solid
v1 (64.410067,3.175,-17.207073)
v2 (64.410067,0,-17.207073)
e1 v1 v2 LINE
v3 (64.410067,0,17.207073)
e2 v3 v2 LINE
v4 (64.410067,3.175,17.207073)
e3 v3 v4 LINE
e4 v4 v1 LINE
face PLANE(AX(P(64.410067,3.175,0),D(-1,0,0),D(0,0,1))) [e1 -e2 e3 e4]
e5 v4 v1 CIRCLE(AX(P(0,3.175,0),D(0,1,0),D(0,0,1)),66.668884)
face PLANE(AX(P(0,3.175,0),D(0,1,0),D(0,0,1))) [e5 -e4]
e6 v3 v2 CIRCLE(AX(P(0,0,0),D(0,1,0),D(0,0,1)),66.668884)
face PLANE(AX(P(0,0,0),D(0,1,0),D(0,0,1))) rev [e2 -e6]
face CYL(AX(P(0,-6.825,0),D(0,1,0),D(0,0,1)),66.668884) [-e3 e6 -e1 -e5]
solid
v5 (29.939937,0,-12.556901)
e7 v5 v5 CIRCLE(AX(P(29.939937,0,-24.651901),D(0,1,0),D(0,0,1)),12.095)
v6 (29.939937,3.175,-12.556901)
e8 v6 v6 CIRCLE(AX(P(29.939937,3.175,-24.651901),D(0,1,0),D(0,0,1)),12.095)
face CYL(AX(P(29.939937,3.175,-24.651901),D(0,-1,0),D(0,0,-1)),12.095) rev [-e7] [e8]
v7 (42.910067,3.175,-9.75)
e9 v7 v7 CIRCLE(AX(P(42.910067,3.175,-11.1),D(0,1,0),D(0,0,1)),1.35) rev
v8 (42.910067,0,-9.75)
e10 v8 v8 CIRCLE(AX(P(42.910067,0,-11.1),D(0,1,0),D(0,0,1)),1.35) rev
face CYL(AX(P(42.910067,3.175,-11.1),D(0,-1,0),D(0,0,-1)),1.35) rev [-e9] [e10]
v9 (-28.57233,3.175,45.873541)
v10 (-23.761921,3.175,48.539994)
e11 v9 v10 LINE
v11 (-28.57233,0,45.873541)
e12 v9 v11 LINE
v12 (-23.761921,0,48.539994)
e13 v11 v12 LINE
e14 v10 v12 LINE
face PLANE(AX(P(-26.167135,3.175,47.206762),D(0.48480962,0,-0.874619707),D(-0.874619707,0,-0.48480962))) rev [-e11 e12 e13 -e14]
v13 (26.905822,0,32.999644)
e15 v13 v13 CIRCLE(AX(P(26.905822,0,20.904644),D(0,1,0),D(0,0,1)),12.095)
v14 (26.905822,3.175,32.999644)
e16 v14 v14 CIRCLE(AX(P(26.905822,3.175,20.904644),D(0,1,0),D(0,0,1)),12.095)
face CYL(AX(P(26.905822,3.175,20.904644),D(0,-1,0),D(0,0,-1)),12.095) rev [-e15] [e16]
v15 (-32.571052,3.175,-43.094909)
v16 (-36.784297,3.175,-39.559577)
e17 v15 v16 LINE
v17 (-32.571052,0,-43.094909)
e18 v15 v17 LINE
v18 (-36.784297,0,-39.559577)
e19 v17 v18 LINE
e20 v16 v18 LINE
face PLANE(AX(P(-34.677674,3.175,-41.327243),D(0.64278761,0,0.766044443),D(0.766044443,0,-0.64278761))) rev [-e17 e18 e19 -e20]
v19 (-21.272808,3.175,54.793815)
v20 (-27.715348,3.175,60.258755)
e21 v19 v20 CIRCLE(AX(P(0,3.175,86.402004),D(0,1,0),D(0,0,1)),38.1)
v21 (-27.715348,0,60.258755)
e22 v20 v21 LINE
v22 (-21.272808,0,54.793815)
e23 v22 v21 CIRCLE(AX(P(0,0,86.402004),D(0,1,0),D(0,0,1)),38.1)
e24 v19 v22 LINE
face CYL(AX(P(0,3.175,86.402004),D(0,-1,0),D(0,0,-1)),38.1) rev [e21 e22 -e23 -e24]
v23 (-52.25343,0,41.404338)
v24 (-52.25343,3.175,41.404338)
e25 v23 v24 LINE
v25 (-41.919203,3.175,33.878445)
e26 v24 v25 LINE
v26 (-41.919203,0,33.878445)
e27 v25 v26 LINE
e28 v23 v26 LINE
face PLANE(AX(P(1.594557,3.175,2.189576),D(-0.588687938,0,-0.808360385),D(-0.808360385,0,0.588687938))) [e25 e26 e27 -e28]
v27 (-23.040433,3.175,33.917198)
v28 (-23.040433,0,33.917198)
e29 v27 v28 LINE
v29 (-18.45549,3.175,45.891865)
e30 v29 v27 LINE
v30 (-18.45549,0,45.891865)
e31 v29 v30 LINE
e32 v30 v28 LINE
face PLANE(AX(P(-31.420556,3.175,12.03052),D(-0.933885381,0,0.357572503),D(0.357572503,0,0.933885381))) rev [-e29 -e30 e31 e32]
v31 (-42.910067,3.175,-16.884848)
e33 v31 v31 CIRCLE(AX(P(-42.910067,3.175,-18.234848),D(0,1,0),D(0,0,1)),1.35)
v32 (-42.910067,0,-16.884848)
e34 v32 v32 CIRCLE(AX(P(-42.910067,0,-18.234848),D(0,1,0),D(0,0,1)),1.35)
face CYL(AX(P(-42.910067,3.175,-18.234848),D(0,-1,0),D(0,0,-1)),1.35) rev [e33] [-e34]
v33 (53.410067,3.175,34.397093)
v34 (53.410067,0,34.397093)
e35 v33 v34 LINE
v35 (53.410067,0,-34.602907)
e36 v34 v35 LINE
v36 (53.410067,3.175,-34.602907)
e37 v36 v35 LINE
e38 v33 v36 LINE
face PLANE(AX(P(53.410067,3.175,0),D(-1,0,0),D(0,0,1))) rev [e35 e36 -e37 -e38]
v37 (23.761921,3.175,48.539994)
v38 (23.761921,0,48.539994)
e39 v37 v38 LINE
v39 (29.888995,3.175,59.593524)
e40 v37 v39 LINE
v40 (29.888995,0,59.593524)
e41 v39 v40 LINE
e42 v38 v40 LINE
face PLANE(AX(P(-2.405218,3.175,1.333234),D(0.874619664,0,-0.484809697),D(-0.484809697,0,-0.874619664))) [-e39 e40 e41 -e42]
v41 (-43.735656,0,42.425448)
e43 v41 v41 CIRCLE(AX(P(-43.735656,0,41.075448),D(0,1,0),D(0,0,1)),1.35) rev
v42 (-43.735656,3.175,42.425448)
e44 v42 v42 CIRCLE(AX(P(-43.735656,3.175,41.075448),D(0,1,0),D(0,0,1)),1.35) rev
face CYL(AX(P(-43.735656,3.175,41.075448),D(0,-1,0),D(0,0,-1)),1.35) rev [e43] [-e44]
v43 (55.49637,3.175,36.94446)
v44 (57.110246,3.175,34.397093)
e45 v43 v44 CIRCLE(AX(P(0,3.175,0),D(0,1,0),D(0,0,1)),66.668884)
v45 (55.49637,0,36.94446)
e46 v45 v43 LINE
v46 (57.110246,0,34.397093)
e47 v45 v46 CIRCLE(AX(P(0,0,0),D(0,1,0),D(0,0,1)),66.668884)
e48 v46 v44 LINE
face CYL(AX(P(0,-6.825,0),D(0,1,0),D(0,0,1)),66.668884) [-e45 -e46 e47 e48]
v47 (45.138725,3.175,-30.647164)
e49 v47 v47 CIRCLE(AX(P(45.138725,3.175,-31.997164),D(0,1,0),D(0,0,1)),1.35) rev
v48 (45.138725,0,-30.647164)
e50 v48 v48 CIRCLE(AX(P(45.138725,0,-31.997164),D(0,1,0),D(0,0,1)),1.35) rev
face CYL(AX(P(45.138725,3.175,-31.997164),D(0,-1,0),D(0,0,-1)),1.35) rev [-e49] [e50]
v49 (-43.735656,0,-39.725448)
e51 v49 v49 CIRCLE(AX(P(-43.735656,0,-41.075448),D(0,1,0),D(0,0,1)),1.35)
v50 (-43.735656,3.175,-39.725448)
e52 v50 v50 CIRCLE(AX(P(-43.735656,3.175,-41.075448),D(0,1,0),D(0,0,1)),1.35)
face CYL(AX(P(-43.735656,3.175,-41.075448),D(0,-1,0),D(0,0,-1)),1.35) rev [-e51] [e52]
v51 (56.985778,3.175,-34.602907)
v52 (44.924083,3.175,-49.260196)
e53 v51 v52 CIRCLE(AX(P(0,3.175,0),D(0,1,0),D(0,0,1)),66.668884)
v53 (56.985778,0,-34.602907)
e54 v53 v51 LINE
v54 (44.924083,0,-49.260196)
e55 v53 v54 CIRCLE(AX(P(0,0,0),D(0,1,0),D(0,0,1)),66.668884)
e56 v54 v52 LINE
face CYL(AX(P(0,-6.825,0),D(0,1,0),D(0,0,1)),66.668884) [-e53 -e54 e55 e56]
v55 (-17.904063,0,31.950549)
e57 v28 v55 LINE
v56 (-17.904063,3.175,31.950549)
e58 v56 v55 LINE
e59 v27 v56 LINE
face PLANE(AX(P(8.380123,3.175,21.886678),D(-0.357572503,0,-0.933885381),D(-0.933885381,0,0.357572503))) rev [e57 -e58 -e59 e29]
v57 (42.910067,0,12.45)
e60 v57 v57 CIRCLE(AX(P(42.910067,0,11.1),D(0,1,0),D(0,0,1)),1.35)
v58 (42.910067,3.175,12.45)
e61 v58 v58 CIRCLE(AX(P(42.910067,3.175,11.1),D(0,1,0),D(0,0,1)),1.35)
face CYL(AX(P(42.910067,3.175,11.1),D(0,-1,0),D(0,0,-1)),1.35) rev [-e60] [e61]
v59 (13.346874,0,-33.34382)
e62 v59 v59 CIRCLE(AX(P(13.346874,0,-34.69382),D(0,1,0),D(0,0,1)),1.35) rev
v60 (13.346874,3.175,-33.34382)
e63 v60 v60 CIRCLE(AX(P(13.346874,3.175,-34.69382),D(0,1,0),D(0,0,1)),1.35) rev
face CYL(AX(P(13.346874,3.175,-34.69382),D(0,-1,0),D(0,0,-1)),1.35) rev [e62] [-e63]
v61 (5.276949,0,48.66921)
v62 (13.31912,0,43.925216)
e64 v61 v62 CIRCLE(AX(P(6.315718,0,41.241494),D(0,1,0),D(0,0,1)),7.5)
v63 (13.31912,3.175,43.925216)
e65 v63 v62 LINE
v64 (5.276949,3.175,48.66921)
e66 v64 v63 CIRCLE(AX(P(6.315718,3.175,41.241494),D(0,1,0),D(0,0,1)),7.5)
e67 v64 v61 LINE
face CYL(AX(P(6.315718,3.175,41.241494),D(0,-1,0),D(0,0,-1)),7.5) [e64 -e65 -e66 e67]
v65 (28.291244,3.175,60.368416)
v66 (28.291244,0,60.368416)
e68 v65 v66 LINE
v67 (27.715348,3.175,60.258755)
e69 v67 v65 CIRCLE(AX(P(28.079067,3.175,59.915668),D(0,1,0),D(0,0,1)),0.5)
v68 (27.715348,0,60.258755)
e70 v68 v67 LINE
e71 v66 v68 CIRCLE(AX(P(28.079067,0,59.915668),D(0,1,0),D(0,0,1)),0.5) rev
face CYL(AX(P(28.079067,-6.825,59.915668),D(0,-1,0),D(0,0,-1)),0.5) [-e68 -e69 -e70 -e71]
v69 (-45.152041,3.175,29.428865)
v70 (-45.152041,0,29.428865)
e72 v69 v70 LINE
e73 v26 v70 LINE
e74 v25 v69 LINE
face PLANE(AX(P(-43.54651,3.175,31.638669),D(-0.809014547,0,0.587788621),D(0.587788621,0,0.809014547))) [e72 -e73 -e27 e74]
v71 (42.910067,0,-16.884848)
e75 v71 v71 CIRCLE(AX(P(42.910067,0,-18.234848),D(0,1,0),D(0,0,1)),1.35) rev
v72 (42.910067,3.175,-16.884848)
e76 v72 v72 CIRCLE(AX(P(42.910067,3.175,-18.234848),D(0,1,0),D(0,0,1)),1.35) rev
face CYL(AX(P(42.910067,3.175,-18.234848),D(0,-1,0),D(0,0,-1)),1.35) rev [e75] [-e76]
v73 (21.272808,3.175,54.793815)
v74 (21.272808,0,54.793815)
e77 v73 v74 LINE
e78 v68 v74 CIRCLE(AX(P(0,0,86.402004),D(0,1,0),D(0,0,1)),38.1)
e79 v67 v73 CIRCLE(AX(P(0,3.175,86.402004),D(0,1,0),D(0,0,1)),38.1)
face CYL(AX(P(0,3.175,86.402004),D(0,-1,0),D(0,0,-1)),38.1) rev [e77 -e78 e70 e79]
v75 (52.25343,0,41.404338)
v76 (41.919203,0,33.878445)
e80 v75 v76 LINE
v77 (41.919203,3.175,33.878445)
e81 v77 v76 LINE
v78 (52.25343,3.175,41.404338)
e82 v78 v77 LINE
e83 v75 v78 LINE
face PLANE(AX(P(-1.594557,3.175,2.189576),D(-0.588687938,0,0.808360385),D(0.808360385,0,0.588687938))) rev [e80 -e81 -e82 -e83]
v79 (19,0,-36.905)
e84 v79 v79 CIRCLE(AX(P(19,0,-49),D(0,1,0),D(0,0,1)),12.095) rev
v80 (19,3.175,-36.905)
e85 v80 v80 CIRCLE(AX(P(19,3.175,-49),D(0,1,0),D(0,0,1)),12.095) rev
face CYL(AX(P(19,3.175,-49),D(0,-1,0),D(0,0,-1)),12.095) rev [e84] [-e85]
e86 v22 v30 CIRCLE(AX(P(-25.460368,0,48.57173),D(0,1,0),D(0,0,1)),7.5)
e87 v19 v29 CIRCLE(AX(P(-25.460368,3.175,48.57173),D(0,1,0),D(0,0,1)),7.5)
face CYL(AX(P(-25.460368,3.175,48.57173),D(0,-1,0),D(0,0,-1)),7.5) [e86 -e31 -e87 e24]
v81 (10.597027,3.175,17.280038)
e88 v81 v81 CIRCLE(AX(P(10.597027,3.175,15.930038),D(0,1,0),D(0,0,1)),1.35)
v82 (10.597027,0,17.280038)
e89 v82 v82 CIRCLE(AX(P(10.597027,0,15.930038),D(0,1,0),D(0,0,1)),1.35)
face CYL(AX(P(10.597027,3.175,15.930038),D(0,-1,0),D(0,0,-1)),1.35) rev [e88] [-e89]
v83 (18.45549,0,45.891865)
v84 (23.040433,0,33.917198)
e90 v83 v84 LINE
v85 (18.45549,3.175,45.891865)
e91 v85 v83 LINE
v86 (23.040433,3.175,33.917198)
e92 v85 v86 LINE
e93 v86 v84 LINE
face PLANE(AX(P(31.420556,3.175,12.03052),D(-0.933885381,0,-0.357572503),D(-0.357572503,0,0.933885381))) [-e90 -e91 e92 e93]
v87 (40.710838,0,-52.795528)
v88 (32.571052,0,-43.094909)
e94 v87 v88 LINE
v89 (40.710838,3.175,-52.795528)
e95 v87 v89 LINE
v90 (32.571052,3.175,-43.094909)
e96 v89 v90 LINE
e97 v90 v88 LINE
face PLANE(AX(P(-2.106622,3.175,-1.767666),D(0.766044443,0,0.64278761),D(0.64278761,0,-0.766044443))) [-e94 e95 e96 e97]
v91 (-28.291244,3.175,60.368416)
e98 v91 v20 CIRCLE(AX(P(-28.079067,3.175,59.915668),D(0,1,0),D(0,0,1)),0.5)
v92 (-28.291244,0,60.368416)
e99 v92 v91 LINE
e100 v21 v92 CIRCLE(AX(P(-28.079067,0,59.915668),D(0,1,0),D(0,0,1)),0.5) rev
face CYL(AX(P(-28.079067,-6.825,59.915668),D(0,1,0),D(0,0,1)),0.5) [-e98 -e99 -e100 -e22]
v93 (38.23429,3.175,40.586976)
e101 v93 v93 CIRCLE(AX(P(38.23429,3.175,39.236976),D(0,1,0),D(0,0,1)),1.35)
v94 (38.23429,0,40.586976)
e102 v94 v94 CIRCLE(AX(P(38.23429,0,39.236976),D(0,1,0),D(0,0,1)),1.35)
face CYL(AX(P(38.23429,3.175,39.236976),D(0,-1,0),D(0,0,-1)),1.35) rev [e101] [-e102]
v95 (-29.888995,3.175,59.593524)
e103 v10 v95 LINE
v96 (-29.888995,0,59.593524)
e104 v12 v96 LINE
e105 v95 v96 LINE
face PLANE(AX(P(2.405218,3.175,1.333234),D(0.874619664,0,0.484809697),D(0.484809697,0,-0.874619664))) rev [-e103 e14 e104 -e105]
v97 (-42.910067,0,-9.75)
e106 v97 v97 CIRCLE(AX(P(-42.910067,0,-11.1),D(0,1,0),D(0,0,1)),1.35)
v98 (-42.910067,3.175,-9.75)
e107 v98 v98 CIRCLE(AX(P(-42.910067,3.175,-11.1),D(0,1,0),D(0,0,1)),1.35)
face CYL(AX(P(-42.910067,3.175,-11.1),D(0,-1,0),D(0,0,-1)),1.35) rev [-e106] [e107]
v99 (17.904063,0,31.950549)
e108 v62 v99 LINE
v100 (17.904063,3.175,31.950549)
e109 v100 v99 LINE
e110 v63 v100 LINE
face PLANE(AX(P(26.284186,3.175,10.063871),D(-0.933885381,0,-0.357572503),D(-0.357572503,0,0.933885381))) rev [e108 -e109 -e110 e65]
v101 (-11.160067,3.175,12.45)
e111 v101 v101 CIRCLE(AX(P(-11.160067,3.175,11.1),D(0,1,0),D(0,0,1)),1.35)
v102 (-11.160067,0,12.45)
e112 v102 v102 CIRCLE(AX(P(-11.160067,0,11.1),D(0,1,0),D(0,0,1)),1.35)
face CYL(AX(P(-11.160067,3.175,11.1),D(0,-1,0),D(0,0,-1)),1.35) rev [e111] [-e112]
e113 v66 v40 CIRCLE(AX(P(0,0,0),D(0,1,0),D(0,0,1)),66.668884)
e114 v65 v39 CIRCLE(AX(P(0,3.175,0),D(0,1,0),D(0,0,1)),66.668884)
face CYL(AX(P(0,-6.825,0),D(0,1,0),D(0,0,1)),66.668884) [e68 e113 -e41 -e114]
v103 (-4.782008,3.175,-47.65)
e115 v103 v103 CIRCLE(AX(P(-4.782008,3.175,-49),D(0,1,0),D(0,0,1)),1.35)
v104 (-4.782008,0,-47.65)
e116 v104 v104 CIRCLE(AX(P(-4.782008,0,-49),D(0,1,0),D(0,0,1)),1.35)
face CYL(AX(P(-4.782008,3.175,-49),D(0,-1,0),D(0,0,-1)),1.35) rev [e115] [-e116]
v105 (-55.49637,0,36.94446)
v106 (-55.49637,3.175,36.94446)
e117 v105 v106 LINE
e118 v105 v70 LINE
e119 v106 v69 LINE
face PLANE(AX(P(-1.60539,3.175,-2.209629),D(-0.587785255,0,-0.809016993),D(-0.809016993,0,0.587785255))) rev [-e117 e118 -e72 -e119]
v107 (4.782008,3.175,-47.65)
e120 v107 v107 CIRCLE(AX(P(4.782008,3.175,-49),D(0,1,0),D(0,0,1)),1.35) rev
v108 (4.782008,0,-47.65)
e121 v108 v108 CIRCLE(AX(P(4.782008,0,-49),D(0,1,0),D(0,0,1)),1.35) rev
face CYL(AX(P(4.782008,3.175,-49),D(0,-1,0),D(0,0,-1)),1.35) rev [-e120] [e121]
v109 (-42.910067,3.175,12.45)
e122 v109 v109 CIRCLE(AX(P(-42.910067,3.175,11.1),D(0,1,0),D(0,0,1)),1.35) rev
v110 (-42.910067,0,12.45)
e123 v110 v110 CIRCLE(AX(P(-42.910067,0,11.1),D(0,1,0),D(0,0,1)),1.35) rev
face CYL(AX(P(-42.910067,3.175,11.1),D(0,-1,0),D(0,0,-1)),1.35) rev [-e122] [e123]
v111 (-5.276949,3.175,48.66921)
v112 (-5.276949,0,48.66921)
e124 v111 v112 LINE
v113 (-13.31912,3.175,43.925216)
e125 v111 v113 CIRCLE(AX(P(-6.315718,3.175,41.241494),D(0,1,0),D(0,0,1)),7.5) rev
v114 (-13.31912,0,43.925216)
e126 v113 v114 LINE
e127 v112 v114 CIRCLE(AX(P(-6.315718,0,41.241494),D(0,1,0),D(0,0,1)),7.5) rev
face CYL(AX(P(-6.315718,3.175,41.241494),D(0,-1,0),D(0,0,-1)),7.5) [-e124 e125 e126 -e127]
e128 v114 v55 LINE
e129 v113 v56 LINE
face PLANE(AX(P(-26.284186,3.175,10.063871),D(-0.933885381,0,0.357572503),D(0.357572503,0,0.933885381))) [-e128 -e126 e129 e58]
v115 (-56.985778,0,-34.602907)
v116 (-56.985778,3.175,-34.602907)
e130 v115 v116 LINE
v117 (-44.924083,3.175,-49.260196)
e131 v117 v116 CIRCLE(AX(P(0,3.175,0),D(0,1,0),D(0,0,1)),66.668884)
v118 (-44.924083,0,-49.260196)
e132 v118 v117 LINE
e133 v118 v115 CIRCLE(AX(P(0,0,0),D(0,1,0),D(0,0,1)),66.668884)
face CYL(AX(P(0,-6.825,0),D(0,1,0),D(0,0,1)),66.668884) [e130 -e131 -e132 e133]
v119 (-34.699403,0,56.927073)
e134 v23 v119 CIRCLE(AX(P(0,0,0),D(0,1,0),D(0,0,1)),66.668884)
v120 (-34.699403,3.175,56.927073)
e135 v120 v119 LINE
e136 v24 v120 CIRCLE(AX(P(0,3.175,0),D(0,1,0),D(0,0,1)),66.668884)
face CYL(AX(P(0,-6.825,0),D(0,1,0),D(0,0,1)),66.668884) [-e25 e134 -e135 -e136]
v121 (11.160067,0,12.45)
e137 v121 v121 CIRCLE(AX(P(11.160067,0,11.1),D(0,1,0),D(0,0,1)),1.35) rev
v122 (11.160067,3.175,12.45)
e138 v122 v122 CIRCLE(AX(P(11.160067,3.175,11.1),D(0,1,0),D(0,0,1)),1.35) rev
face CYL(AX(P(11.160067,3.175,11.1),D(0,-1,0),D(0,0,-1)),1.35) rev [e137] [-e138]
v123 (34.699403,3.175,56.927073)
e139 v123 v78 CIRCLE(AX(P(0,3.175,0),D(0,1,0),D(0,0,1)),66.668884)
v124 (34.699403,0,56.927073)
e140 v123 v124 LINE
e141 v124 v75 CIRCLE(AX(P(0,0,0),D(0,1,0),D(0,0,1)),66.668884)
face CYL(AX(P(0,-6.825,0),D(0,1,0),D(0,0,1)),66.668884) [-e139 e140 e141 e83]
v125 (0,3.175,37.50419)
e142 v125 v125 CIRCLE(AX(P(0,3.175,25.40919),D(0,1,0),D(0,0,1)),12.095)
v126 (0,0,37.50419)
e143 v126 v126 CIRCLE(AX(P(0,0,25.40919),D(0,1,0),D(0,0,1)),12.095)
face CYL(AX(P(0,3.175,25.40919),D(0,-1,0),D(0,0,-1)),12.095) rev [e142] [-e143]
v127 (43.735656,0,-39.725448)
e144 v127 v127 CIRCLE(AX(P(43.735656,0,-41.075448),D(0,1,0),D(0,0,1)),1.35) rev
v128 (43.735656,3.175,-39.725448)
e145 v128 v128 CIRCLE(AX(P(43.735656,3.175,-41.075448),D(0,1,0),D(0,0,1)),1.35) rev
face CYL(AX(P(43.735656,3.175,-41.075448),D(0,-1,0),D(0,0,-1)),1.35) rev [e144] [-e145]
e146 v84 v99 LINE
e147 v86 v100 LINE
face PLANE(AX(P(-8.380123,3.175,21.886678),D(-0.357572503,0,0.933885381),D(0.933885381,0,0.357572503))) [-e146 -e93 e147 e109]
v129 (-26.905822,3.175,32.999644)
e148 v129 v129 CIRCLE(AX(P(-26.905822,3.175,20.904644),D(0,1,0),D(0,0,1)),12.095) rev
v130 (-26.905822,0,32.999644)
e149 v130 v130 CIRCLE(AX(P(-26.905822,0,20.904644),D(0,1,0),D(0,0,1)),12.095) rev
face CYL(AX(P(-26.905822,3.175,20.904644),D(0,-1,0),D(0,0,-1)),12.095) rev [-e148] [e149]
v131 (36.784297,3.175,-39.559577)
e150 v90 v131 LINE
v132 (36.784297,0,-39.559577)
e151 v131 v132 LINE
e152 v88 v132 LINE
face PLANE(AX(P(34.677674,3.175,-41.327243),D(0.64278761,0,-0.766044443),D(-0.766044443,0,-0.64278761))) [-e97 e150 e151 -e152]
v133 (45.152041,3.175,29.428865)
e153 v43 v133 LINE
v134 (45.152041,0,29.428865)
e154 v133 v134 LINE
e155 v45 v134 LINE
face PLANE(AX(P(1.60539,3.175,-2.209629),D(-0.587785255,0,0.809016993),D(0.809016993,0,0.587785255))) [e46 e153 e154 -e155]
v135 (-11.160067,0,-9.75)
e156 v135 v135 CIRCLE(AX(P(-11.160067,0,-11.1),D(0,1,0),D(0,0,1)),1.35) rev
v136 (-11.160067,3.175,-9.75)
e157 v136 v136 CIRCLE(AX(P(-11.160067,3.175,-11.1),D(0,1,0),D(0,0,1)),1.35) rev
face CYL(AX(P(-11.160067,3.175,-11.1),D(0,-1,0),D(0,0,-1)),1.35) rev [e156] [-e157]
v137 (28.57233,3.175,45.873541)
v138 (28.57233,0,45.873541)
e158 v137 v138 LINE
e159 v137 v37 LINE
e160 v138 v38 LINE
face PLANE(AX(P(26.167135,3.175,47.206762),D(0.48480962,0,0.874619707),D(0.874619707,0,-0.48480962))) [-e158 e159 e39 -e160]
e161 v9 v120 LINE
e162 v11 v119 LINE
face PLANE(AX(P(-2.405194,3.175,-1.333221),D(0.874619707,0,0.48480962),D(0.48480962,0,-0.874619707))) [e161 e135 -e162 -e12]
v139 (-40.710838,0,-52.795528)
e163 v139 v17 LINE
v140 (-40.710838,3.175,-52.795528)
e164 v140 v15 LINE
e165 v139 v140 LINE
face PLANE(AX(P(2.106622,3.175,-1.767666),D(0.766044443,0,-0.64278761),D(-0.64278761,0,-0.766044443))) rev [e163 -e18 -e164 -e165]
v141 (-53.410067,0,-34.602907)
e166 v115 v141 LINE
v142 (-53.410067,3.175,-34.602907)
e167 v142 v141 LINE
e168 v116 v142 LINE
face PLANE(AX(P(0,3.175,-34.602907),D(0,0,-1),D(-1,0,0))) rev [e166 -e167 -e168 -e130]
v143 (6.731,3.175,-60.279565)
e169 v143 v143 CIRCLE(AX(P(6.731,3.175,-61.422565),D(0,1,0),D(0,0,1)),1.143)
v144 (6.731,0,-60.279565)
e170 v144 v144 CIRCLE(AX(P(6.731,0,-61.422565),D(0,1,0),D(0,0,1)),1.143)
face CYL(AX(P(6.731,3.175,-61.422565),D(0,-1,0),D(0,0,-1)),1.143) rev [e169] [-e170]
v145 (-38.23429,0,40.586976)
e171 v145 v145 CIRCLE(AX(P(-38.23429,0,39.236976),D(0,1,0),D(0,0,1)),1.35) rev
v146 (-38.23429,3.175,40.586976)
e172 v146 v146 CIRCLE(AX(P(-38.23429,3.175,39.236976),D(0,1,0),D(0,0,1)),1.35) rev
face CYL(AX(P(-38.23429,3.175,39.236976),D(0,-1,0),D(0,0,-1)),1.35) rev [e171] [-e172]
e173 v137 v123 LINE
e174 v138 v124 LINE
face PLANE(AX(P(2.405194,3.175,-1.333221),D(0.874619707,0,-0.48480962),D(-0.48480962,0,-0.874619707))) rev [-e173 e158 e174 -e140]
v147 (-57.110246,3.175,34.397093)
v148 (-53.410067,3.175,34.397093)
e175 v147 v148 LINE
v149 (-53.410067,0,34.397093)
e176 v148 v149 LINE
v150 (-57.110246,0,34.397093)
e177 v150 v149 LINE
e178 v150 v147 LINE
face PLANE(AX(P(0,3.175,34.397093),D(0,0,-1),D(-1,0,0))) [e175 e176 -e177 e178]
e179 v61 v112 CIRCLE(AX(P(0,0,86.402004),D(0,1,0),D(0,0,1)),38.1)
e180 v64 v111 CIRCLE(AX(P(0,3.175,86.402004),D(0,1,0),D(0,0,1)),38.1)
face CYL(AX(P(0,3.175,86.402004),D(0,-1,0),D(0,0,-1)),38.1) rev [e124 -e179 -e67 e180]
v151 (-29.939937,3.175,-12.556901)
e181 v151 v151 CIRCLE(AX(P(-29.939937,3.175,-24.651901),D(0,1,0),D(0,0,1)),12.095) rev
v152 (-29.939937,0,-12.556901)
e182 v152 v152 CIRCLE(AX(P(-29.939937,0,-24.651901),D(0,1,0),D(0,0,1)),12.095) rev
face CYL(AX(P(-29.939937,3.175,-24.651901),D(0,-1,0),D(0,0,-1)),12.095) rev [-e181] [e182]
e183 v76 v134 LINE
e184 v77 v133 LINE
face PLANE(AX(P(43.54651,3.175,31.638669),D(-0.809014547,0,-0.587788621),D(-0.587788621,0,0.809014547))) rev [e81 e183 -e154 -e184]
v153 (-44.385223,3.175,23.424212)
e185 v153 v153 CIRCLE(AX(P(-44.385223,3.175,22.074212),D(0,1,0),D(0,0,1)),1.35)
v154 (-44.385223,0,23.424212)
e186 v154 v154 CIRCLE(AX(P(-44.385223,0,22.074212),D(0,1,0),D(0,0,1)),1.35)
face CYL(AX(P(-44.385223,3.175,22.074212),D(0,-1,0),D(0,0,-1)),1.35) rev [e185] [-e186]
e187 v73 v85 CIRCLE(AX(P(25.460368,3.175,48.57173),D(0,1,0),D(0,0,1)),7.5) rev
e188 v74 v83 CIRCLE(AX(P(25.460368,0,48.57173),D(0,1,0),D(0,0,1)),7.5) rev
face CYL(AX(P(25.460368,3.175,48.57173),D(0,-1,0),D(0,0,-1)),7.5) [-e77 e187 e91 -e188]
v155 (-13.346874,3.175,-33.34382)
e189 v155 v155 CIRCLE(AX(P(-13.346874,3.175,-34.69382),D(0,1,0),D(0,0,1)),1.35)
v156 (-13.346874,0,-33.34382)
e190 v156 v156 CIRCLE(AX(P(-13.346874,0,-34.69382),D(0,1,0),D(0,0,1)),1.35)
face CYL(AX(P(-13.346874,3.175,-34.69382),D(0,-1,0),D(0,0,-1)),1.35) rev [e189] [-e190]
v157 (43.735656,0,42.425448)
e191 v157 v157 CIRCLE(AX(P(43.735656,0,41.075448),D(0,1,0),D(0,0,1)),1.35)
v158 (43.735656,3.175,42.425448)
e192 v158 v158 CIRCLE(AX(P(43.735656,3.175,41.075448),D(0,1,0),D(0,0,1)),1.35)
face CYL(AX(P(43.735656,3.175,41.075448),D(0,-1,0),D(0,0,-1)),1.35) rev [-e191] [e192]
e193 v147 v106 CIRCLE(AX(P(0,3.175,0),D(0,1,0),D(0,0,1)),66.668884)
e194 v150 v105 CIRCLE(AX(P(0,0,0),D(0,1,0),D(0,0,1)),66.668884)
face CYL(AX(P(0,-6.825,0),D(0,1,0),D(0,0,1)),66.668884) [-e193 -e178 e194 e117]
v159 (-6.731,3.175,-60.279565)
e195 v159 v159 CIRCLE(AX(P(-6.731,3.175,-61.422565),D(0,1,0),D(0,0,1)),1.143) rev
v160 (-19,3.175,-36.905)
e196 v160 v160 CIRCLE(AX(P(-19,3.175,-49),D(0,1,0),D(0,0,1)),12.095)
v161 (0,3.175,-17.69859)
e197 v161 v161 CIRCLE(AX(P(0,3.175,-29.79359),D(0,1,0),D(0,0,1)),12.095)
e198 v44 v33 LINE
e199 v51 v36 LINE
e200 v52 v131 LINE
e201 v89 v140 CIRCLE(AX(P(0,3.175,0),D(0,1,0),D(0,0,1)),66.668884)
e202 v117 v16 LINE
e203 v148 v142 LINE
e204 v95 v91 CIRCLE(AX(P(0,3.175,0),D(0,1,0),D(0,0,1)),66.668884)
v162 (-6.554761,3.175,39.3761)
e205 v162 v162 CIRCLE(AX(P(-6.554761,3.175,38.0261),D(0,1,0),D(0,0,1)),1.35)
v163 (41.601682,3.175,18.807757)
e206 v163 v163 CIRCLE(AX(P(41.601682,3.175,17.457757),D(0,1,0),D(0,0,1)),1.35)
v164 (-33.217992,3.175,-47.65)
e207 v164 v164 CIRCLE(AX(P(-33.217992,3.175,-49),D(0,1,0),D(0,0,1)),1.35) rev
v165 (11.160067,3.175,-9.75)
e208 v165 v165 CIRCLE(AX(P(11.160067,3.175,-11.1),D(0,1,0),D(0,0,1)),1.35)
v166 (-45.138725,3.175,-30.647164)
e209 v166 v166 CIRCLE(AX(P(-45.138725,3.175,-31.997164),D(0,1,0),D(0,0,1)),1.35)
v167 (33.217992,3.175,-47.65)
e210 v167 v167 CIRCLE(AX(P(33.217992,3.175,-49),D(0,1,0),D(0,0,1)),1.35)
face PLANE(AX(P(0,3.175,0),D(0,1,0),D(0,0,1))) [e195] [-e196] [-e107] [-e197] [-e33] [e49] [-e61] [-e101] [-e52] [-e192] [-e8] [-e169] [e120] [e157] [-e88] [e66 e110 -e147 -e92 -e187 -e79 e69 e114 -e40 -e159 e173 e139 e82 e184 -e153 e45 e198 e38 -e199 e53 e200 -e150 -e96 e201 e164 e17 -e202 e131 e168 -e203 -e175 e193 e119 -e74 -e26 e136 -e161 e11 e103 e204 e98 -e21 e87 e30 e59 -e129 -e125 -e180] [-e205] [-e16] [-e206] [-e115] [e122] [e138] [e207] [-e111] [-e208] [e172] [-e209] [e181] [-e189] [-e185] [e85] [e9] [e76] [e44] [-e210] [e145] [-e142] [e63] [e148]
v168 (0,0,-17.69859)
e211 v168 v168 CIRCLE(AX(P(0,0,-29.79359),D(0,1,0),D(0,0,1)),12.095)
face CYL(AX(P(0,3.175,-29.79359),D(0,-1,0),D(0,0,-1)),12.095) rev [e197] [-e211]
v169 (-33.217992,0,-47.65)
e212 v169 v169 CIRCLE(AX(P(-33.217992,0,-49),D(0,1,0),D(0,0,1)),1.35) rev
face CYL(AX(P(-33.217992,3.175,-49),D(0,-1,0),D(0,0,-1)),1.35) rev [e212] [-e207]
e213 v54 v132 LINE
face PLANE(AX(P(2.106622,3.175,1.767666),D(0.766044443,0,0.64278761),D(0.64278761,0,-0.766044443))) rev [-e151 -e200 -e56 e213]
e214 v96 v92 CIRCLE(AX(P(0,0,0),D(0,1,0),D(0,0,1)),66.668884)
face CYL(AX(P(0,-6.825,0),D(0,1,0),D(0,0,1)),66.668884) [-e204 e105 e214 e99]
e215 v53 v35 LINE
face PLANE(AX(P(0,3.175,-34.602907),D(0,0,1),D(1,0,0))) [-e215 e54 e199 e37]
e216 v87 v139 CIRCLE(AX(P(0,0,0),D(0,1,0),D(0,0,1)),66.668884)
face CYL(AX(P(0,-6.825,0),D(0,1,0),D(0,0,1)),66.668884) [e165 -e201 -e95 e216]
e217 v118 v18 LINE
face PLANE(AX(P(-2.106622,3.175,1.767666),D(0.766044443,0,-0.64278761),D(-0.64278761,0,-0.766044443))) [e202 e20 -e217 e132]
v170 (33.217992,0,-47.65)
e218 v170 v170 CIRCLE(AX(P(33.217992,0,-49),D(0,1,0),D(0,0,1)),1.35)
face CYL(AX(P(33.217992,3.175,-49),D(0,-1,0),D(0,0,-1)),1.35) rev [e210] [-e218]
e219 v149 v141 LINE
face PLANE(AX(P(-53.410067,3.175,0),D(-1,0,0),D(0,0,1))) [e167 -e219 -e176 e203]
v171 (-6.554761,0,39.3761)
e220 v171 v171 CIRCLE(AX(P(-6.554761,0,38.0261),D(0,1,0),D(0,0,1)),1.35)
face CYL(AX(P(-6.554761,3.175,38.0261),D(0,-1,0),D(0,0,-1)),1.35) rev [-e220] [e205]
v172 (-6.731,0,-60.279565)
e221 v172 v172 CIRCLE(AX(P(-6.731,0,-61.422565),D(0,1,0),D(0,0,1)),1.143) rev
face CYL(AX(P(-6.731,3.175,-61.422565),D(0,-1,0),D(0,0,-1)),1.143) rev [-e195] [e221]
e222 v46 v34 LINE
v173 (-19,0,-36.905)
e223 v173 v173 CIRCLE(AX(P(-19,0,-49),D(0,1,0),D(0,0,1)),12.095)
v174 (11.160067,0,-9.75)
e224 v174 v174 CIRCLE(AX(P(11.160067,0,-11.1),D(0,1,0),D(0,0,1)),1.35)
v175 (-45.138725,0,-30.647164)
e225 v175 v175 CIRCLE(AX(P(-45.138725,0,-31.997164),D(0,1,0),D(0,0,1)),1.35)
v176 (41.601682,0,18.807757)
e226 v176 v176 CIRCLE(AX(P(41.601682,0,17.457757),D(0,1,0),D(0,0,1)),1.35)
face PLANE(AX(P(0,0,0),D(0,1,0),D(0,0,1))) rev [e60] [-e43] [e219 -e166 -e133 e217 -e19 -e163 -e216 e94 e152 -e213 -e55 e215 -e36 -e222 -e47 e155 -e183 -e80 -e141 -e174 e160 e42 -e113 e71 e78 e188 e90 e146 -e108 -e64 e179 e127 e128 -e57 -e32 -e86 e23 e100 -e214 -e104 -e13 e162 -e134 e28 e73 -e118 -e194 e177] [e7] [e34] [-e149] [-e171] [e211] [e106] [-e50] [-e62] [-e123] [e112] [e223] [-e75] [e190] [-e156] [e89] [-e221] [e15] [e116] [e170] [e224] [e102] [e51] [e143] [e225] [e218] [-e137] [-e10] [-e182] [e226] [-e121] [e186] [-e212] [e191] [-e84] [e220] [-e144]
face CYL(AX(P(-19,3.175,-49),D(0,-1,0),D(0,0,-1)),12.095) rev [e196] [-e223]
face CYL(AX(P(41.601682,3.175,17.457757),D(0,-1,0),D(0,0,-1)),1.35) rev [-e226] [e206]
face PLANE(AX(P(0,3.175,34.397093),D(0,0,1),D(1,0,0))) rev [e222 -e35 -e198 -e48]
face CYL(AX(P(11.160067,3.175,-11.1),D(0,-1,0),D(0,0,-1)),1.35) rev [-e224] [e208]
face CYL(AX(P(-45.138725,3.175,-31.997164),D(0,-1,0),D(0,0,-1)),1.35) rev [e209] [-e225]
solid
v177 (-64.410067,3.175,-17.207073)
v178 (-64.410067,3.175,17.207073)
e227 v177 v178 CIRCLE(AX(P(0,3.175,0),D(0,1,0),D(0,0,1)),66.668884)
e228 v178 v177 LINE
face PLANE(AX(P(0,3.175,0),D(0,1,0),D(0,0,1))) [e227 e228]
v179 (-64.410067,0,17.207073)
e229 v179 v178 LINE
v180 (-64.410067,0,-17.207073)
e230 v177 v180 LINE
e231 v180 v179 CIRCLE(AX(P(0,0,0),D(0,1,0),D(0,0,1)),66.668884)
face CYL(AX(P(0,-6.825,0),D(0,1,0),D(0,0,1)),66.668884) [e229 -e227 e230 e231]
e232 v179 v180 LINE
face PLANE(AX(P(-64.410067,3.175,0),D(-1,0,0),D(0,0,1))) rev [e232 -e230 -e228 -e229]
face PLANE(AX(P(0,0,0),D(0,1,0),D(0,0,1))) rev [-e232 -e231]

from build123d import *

# Parameters (mm, degrees)
BOSS_EXTRUDE2_OUTLINE_R   = 1.35
BOSS_EXTRUDE2_OUTLINE_W   = 11
BOSS_EXTRUDE2_OUTLINE_H   = 69
BOSS_EXTRUDE2_OUTLINE_R_2 = 12.095
BOSS_EXTRUDE2_OUTLINE_R_3 = 1.143
BOSS_EXTRUDE2_DEPTH       = 3.175
SKETCH2_R                 = 88.186521352
SKETCH2_R_2               = 66.668884373
CUT_EXTRUDE2_DEPTH        = 10
FILLET1_R                 = 0.5


# Read off the part's stored shape, not the designer's step: Boss-Extrude2
with BuildPart() as part:
    # Boss-Extrude2 outline → Boss-Extrude2 (new body)
    with BuildSketch(Plane(origin=(0, 0, 0), x_dir=(1, 0, 0), z_dir=(0, 1, 0))):
        with BuildLine():
            ThreePointArc((-13.319120077, -43.925216134), (-10.126305957, -47.701325441), (-5.276948898, -48.669209533))
            ThreePointArc((-5.276948898, -48.669209533), (0, -48.302004425), (5.276948898, -48.669209533))
            ThreePointArc((5.276948898, -48.669209533), (10.126305957, -47.701325441), (13.319120077, -43.925216134))
            Line((13.319120077, -43.925216134), (17.904063474, -31.950549264))
            Line((17.904063474, -31.950549264), (23.040433069, -33.917198033))
            Line((23.040433069, -33.917198033), (18.455489673, -45.891864903))
            ThreePointArc((18.455489673, -45.891864903), (18.309924074, -50.834725832), (21.272807595, -54.79381471))
            ThreePointArc((21.272807595, -54.79381471), (26.466137741, -58.99482374), (30.845959646, -64.038266509))
            ThreePointArc((30.845959646, -64.038266509), (30.722917613, -61.793165345), (29.939937248, -59.685427143))
            Line((29.939937248, -59.685427143), (23.761921217, -48.539993511))
            Line((23.761921217, -48.539993511), (28.572329606, -45.873540599))
            Line((28.572329606, -45.873540599), (34.750345491, -57.018976288))
            ThreePointArc((34.750345491, -57.018976288), (39.797694407, -60.728851606), (45.899993549, -59.314337155))
            ThreePointArc((45.899993549, -59.314337155), (49.682691748, -56.183895741), (53.252452412, -52.812652955))
            ThreePointArc((53.252452412, -52.812652955), (55.400241506, -46.895968251), (52.284336639, -41.426846498))
            Line((52.284336639, -41.426846498), (41.919203487, -33.87844485))
            Line((41.919203487, -33.87844485), (45.152040904, -29.428864843))
            Line((45.152040904, -29.428864843), (55.532494673, -36.970706015))
            ThreePointArc((55.532494673, -36.970706015), (61.693781059, -38.244294688), (66.657056834, -34.377852961))
            ThreePointArc((66.657056834, -34.377852961), (74.442262703, 9.129596032), (56.374397975, 49.466425512))
            ThreePointArc((56.374397975, 49.466425512), (50.654117331, 52.01932544), (44.991624855, 49.340690033))
            Line((44.991624855, 49.340690033), (36.78429665, 39.55957716))
            Line((36.78429665, 39.55957716), (32.571052213, 43.094909013))
            Line((32.571052213, 43.094909013), (40.778380417, 52.876021886))
            ThreePointArc((40.778380417, 52.876021886), (42.433039833, 58.917628535), (38.925607882, 64.107698843))
            ThreePointArc((38.925607882, 64.107698843), (0, 75), (-38.925607882, 64.107698843))
            ThreePointArc((-38.925607882, 64.107698843), (-42.433039833, 58.917628535), (-40.778380417, 52.876021886))
            Line((-40.778380417, 52.876021886), (-32.571052213, 43.094909013))
            Line((-32.571052213, 43.094909013), (-36.78429665, 39.55957716))
            Line((-36.78429665, 39.55957716), (-44.991624855, 49.340690033))
            ThreePointArc((-44.991624855, 49.340690033), (-50.654117331, 52.01932544), (-56.374397975, 49.466425512))
            ThreePointArc((-56.374397975, 49.466425512), (-74.442262703, 9.129596032), (-66.657056834, -34.377852961))
            ThreePointArc((-66.657056834, -34.377852961), (-61.693781059, -38.244294688), (-55.532494673, -36.970706015))
            Line((-55.532494673, -36.970706015), (-45.152040904, -29.428864843))
            Line((-45.152040904, -29.428864843), (-41.919203487, -33.87844485))
            Line((-41.919203487, -33.87844485), (-52.284336639, -41.426846498))
            ThreePointArc((-52.284336639, -41.426846498), (-55.400241506, -46.895968251), (-53.252452412, -52.812652955))
            ThreePointArc((-53.252452412, -52.812652955), (-49.682691748, -56.183895741), (-45.899993549, -59.314337155))
            ThreePointArc((-45.899993549, -59.314337155), (-39.797694407, -60.728851606), (-34.750345491, -57.018976288))
            Line((-34.750345491, -57.018976288), (-28.572329606, -45.873540599))
            Line((-28.572329606, -45.873540599), (-23.761921217, -48.539993511))
            Line((-23.761921217, -48.539993511), (-29.939937248, -59.685427143))
            ThreePointArc((-29.939937248, -59.685427143), (-30.722917613, -61.793165345), (-30.845959646, -64.038266509))
            ThreePointArc((-30.845959646, -64.038266509), (-26.466137741, -58.99482374), (-21.272807595, -54.79381471))
            ThreePointArc((-21.272807595, -54.79381471), (-18.309924074, -50.834725832), (-18.455489673, -45.891864903))
            Line((-18.455489673, -45.891864903), (-23.040433069, -33.917198033))
            Line((-23.040433069, -33.917198033), (-17.904063474, -31.950549264))
            Line((-17.904063474, -31.950549264), (-13.319120077, -43.925216134))
        make_face()
        with Locations((-43.735655662, -41.075447944)):
            Circle(BOSS_EXTRUDE2_OUTLINE_R, mode=Mode.SUBTRACT)
        with Locations((-38.234289702, -39.23697625)):
            Circle(BOSS_EXTRUDE2_OUTLINE_R, mode=Mode.SUBTRACT)
        with Locations((-6.55476095, -38.026099982)):
            Circle(BOSS_EXTRUDE2_OUTLINE_R, mode=Mode.SUBTRACT)
        with Locations((-44.385223141, -22.074211772)):
            Circle(BOSS_EXTRUDE2_OUTLINE_R, mode=Mode.SUBTRACT)
        with Locations((-58.910067426, 0.102907352)):
            Rectangle(BOSS_EXTRUDE2_OUTLINE_W, BOSS_EXTRUDE2_OUTLINE_H, mode=Mode.SUBTRACT)
        with Locations((-42.910067426, -11.1)):
            Circle(BOSS_EXTRUDE2_OUTLINE_R, mode=Mode.SUBTRACT)
        with Locations((-26.905821676, -20.904643604)):
            Circle(BOSS_EXTRUDE2_OUTLINE_R_2, mode=Mode.SUBTRACT)
        with Locations((-11.160067426, -11.1)):
            Circle(BOSS_EXTRUDE2_OUTLINE_R, mode=Mode.SUBTRACT)
        with Locations((38.234289702, -39.23697625)):
            Circle(BOSS_EXTRUDE2_OUTLINE_R, mode=Mode.SUBTRACT)
        with Locations((43.735655662, -41.075447944)):
            Circle(BOSS_EXTRUDE2_OUTLINE_R, mode=Mode.SUBTRACT)
        with Locations((0, -25.409190322)):
            Circle(BOSS_EXTRUDE2_OUTLINE_R_2, mode=Mode.SUBTRACT)
        with Locations((10.597026674, -15.930038136)):
            Circle(BOSS_EXTRUDE2_OUTLINE_R, mode=Mode.SUBTRACT)
        with Locations((26.905821676, -20.904643604)):
            Circle(BOSS_EXTRUDE2_OUTLINE_R_2, mode=Mode.SUBTRACT)
        with Locations((11.160067426, -11.1)):
            Circle(BOSS_EXTRUDE2_OUTLINE_R, mode=Mode.SUBTRACT)
        with Locations((41.601681906, -17.457756634)):
            Circle(BOSS_EXTRUDE2_OUTLINE_R, mode=Mode.SUBTRACT)
        with Locations((42.910067426, -11.1)):
            Circle(BOSS_EXTRUDE2_OUTLINE_R, mode=Mode.SUBTRACT)
        with Locations((58.910067426, 0.102907352)):
            Rectangle(BOSS_EXTRUDE2_OUTLINE_W, BOSS_EXTRUDE2_OUTLINE_H, mode=Mode.SUBTRACT)
        with Locations((-42.910067426, 11.1)):
            Circle(BOSS_EXTRUDE2_OUTLINE_R, mode=Mode.SUBTRACT)
        with Locations((-42.910067426, 18.234848025)):
            Circle(BOSS_EXTRUDE2_OUTLINE_R, mode=Mode.SUBTRACT)
        with Locations((-45.13872464, 31.997163897)):
            Circle(BOSS_EXTRUDE2_OUTLINE_R, mode=Mode.SUBTRACT)
        with Locations((-11.160067426, 11.1)):
            Circle(BOSS_EXTRUDE2_OUTLINE_R, mode=Mode.SUBTRACT)
        with Locations((-29.939937248, 24.651901309)):
            Circle(BOSS_EXTRUDE2_OUTLINE_R_2, mode=Mode.SUBTRACT)
        with Locations((-13.346873881, 34.693819966)):
            Circle(BOSS_EXTRUDE2_OUTLINE_R, mode=Mode.SUBTRACT)
        with Locations((-43.735655662, 41.075447944)):
            Circle(BOSS_EXTRUDE2_OUTLINE_R, mode=Mode.SUBTRACT)
        with Locations((-33.21799214, 49)):
            Circle(BOSS_EXTRUDE2_OUTLINE_R, mode=Mode.SUBTRACT)
        with Locations((-19, 49)):
            Circle(BOSS_EXTRUDE2_OUTLINE_R_2, mode=Mode.SUBTRACT)
        with Locations((-4.78200786, 49)):
            Circle(BOSS_EXTRUDE2_OUTLINE_R, mode=Mode.SUBTRACT)
        with Locations((-6.731, 61.422565207)):
            Circle(BOSS_EXTRUDE2_OUTLINE_R_3, mode=Mode.SUBTRACT)
        with Locations((11.160067426, 11.1)):
            Circle(BOSS_EXTRUDE2_OUTLINE_R, mode=Mode.SUBTRACT)
        with Locations((0, 29.793589551)):
            Circle(BOSS_EXTRUDE2_OUTLINE_R_2, mode=Mode.SUBTRACT)
        with Locations((13.346873881, 34.693819966)):
            Circle(BOSS_EXTRUDE2_OUTLINE_R, mode=Mode.SUBTRACT)
        with Locations((29.939937248, 24.651901309)):
            Circle(BOSS_EXTRUDE2_OUTLINE_R_2, mode=Mode.SUBTRACT)
        with Locations((42.910067426, 11.1)):
            Circle(BOSS_EXTRUDE2_OUTLINE_R, mode=Mode.SUBTRACT)
        with Locations((42.910067426, 18.234848025)):
            Circle(BOSS_EXTRUDE2_OUTLINE_R, mode=Mode.SUBTRACT)
        with Locations((45.13872464, 31.997163897)):
            Circle(BOSS_EXTRUDE2_OUTLINE_R, mode=Mode.SUBTRACT)
        with Locations((4.78200786, 49)):
            Circle(BOSS_EXTRUDE2_OUTLINE_R, mode=Mode.SUBTRACT)
        with Locations((19, 49)):
            Circle(BOSS_EXTRUDE2_OUTLINE_R_2, mode=Mode.SUBTRACT)
        with Locations((33.21799214, 49)):
            Circle(BOSS_EXTRUDE2_OUTLINE_R, mode=Mode.SUBTRACT)
        with Locations((6.731, 61.422565207)):
            Circle(BOSS_EXTRUDE2_OUTLINE_R_3, mode=Mode.SUBTRACT)
        with Locations((43.735655662, 41.075447944)):
            Circle(BOSS_EXTRUDE2_OUTLINE_R, mode=Mode.SUBTRACT)
    extrude(amount=BOSS_EXTRUDE2_DEPTH)

    # Sketch2 → Cut-Extrude2 (cut)
    with BuildSketch(Plane(origin=(0, 3.175, 0), x_dir=(1, 0, 0), z_dir=(0, 1, 0))):
        Circle(SKETCH2_R)
        Circle(SKETCH2_R_2, mode=Mode.SUBTRACT)
    extrude(amount=-CUT_EXTRUDE2_DEPTH, mode=Mode.SUBTRACT)


with BuildPart() as cut_extrude2_piece_1:
    # of the separate pieces the step leaves, piece 1, a body of its own (cut_extrude2_pieces)
    add(part.part.solids().sort_by_distance((-36.78429665, 0, -39.55957716))[0])

    # Fillet1
    fillet1_edges = [cut_extrude2_piece_1.edges().sort_by_distance(p)[0] for p in [
        (-27.961277889, 1.5875, 60.521955375),
        (27.961277889, 1.5875, 60.521955375),
    ]]
    fillet(fillet1_edges, radius=FILLET1_R)


with BuildPart() as cut_extrude2_piece_2:
    # of the separate pieces the step leaves, piece 2, a body of its own (cut_extrude2_pieces)
    add(part.part.solids().sort_by_distance((-64.410067426, 0, 17.207072898))[0])


with BuildPart() as cut_extrude2_piece_3:
    # of the separate pieces the step leaves, piece 3, a body of its own (cut_extrude2_pieces)
    add(part.part.solids().sort_by_distance((64.410067426, 0, -17.207072898))[0])


solid = Compound([cut_extrude2_piece_1.part, cut_extrude2_piece_2.part, cut_extrude2_piece_3.part])
